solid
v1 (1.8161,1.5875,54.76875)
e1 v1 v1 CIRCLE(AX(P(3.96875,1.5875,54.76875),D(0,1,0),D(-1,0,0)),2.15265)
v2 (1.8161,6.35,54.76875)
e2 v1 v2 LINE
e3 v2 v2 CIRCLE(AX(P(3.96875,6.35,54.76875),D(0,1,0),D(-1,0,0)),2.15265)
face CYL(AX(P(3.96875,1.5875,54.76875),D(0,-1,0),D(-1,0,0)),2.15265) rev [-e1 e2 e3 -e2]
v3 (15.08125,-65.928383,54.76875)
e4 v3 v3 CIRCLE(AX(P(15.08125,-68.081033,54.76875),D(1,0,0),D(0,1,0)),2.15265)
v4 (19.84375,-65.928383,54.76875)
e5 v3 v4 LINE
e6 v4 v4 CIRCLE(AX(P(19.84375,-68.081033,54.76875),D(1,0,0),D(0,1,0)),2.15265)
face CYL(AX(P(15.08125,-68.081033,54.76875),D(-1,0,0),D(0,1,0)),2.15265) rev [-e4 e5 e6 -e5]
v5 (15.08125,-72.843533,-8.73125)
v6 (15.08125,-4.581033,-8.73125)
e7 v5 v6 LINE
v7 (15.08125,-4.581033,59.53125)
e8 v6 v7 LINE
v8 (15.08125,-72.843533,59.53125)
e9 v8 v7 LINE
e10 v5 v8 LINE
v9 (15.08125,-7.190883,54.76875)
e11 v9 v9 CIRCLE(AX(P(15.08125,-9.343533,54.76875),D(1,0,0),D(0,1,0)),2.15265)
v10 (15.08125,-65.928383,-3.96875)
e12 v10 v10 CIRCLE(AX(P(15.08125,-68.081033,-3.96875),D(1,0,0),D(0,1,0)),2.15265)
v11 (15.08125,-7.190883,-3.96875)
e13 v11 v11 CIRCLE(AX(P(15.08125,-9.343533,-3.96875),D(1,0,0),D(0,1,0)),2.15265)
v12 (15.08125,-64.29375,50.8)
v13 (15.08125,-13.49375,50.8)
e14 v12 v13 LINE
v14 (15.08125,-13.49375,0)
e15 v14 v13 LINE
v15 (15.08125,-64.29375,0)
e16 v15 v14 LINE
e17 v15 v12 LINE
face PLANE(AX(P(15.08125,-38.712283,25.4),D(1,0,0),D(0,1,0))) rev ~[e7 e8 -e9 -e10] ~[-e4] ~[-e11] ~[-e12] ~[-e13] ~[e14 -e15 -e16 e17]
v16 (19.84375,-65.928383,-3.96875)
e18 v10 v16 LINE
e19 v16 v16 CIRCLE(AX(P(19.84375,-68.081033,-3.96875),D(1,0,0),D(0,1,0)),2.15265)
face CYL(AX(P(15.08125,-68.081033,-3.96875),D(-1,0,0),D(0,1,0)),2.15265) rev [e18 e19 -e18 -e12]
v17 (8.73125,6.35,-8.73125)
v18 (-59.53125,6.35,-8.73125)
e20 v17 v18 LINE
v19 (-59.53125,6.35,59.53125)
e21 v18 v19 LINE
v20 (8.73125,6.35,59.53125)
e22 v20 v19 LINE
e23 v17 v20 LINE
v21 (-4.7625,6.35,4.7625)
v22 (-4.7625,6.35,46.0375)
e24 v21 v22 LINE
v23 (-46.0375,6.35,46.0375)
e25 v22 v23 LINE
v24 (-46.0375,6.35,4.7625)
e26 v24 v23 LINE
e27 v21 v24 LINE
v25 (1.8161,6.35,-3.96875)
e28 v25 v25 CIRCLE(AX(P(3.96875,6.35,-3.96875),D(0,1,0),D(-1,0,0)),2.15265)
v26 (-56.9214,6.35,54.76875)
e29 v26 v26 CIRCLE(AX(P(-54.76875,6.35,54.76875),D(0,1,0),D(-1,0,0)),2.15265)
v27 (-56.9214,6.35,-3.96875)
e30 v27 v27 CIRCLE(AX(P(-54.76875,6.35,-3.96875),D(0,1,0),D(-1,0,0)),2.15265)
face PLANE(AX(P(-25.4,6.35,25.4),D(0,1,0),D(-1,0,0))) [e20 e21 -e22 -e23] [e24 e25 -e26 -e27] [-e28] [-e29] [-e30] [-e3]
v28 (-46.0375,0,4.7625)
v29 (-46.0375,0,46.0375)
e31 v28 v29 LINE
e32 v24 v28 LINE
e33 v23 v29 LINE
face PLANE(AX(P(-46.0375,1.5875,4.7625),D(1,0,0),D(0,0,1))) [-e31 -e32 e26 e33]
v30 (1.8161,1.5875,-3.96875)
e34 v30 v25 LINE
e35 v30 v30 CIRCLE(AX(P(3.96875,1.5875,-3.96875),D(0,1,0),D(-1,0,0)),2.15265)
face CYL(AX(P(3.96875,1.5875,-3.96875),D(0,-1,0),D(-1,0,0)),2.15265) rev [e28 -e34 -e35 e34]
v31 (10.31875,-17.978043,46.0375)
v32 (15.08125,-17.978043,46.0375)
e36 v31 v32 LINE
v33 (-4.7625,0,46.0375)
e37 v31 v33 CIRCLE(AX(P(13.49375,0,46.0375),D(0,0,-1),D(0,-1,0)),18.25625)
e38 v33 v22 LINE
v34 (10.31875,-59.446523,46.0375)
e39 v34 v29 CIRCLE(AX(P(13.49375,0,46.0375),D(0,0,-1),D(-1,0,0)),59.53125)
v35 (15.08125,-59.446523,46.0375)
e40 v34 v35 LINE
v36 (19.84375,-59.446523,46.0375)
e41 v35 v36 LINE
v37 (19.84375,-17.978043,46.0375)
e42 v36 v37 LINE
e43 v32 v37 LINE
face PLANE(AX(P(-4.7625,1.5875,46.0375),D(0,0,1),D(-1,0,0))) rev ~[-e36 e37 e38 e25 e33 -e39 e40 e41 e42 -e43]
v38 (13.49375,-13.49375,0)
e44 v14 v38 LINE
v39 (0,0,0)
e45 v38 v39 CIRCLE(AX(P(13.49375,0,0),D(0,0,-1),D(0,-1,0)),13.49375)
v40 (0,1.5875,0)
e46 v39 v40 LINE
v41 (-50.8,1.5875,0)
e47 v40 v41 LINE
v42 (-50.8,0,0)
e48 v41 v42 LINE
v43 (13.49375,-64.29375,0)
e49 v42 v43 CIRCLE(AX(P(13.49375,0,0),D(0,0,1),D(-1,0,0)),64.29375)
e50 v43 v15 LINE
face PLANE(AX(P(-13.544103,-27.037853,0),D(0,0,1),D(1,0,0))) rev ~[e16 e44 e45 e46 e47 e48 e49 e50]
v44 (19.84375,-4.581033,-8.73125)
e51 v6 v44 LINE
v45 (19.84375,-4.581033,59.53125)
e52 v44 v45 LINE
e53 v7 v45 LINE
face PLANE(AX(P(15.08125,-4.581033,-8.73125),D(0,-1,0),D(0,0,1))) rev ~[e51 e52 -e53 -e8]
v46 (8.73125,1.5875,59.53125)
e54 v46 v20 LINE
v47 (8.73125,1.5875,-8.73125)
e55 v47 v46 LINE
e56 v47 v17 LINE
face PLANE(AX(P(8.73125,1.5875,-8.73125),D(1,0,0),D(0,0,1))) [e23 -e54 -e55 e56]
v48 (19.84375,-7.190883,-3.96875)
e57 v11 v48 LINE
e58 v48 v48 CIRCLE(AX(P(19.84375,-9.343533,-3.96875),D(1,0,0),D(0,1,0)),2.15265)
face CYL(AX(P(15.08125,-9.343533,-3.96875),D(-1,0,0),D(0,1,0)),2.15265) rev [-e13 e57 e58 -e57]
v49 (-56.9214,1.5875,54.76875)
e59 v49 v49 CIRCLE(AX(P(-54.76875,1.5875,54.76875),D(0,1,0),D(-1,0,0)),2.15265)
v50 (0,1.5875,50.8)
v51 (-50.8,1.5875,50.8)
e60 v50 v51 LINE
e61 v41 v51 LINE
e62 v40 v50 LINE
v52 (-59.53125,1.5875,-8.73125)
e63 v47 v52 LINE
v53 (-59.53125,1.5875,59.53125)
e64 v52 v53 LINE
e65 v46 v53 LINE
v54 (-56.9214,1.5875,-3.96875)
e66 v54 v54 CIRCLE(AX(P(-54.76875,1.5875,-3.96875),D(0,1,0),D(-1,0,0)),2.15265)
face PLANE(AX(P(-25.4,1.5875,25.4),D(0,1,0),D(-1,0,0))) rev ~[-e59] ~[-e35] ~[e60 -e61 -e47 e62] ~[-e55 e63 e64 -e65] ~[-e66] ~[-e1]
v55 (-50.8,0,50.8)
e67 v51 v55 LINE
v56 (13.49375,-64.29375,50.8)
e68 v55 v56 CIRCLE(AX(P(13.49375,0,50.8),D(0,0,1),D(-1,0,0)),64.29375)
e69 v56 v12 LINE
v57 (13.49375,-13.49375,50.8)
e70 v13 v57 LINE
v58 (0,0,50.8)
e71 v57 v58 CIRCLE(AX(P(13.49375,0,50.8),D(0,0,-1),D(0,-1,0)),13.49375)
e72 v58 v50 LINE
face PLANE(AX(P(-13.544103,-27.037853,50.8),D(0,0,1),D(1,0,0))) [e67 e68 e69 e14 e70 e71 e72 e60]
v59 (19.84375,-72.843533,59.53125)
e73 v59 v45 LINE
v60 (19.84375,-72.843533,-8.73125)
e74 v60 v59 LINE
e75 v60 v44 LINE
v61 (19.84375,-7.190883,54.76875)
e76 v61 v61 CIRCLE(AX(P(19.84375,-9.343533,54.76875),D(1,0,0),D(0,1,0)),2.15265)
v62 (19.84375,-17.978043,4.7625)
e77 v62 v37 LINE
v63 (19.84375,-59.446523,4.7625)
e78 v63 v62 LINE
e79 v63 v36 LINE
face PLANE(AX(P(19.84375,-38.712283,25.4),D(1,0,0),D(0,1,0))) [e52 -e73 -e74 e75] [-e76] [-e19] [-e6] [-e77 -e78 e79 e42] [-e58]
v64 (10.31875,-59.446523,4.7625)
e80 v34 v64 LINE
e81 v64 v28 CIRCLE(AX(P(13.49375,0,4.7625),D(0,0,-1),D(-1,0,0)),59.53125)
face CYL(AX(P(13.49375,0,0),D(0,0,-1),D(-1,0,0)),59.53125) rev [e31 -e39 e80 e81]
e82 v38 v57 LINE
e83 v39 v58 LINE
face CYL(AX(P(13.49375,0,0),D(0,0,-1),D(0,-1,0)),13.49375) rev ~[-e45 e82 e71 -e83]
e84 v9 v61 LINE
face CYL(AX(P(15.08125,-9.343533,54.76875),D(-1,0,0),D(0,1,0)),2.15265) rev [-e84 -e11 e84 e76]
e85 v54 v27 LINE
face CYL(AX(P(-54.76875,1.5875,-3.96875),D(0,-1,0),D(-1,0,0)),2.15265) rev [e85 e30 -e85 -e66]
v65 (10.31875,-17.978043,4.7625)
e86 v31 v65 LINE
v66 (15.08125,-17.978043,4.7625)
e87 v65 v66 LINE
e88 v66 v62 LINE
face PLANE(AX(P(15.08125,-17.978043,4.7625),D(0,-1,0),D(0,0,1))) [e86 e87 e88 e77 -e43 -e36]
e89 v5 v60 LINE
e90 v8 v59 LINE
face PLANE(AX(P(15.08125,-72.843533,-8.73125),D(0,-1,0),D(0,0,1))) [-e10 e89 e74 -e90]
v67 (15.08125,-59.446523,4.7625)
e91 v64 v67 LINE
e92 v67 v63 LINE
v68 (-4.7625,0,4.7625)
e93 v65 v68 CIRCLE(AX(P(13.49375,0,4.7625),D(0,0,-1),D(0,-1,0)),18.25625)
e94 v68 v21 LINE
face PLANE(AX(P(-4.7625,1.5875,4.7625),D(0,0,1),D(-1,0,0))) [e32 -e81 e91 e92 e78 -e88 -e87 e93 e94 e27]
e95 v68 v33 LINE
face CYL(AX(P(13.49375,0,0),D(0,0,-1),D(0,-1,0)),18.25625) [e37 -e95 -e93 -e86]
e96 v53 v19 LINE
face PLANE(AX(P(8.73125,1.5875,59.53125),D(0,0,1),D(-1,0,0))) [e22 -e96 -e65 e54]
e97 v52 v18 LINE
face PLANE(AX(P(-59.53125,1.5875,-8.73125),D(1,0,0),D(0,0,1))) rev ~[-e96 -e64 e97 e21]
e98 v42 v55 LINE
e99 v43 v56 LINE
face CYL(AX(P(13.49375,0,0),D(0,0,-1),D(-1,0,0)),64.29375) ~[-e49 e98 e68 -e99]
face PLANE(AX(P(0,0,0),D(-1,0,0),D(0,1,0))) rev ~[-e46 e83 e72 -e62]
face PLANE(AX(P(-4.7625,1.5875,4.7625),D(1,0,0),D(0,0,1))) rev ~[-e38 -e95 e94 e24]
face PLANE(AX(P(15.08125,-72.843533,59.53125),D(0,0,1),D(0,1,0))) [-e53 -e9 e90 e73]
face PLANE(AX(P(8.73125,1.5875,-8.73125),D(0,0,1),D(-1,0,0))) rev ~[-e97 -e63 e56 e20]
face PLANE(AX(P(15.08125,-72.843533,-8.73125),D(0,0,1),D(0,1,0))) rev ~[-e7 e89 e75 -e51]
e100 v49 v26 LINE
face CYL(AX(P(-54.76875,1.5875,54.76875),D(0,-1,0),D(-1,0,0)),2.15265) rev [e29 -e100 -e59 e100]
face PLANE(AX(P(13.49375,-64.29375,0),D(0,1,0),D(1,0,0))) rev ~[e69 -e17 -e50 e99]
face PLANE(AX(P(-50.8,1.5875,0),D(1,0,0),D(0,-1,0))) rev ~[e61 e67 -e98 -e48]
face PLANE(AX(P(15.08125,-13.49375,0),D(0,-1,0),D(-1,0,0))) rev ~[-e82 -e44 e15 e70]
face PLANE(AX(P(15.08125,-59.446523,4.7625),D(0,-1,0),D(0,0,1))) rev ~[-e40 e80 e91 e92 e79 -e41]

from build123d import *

# Parameters (mm, degrees)
F1_DEPTH = 50.8
F2_T     = -4.7625
F3_DEPTH = 4.7625
F4_W     = 68.2625
F4_H     = 68.2625
F4_R     = 2.15265
F4_W_2   = 50.8
F4_H_2   = 50.8
F4_W_3   = 41.4684797912
F4_H_3   = 41.275
F5_DEPTH = 4.7625
F6_W     = 68.2625
F6_H     = 68.2625
F6_R     = 2.15265
F6_W_2   = 41.275
F6_H_2   = 41.275
F7_DEPTH = 4.7625
F8_R     = 2.15265
F9_DEPTH = 74.6135


# Not quite as in the source:
# - a feature names something its author has since deleted; it is built from what else it names


with BuildPart() as f1:
    # F0 (on Top) → F1 (new body)
    with BuildSketch(Plane.XY):
        with BuildLine():
            ThreePointArc((13.49375, -13.49375), (3.9522278714, -9.5415221286), (0, 0))
            Line((0, 0), (0, 1.5875))
            Line((0, 1.5875), (-50.8, 1.5875))
            Line((-50.8, 1.5875), (-50.8, 0))
            ThreePointArc((-50.8, 0), (-31.9687966129, -45.4625466129), (13.49375, -64.29375))
            Line((13.49375, -64.29375), (15.08125, -64.29375))
            Line((15.08125, -64.29375), (15.08125, -13.49375))
            Line((15.08125, -13.49375), (13.49375, -13.49375))
        make_face()
    extrude(amount=F1_DEPTH)

    # F2
    f2_openings = [f1.faces().sort_by_distance(p)[0] for p in [
        (-25.4, 1.5875, 25.4),
    ]]
    offset(amount=F2_T, openings=f2_openings)

    # F3 (cut, through all): a face of the model
    f3_faces = [f1.faces().sort_by_distance(p)[0] for p in [
        (10.31875, -38.7122831446, 25.4),
    ]]
    extrude(f3_faces, amount=-F3_DEPTH, mode=Mode.SUBTRACT)

    # F4 (on face) → F5 (join)
    with BuildSketch(Plane.YZ.offset(15.08125)):
        with Locations((-38.7122831446, 25.4)):
            Rectangle(F4_W, F4_H)
        with Locations((-68.0810331446, -3.96875)):
            Circle(F4_R, mode=Mode.SUBTRACT)
        with Locations((-38.89375, 25.4)):
            Rectangle(F4_W_2, F4_H_2, mode=Mode.SUBTRACT)
        with Locations((-9.3435331446, -3.96875)):
            Circle(F4_R, mode=Mode.SUBTRACT)
        with Locations((-68.0810331446, 54.76875)):
            Circle(F4_R, mode=Mode.SUBTRACT)
        with Locations((-9.3435331446, 54.76875)):
            Circle(F4_R, mode=Mode.SUBTRACT)
        with Locations((-38.89375, 25.4)):
            Rectangle(F4_W_2, F4_H_2)
        with Locations((-38.7122831446, 25.4)):
            Rectangle(F4_W_3, F4_H_3, mode=Mode.SUBTRACT)
    extrude(amount=F5_DEPTH)

    # F6 (on face) → F7 (join)
    with BuildSketch(Plane(origin=(0, 1.5875, 0), x_dir=(-1, 0, 0), z_dir=(0, 1, 0))):
        with Locations((25.4, 25.4)):
            Rectangle(F6_W, F6_H)
        with Locations((-3.96875, -3.96875)):
            Circle(F6_R, mode=Mode.SUBTRACT)
        with Locations((54.76875, -3.96875)):
            Circle(F6_R, mode=Mode.SUBTRACT)
        with Locations((25.4, 25.4)):
            Rectangle(F6_W_2, F6_H_2, mode=Mode.SUBTRACT)
        with Locations((-3.96875, 54.76875)):
            Circle(F6_R, mode=Mode.SUBTRACT)
        with Locations((54.76875, 54.76875)):
            Circle(F6_R, mode=Mode.SUBTRACT)
    extrude(amount=F7_DEPTH)

    # F8 (on face) → F9 (cut, through all)
    with BuildSketch(Plane(origin=(15.08125, 0, 0), x_dir=(0, -1, 0), z_dir=(-1, 0, 0))):
        with BuildLine():
            ThreePointArc((68.0810331446, 59.53125), (64.7134370992, 51.4011539546), (72.8435331446, 54.76875))
            ThreePointArc((72.8435331446, 54.76875), (71.44862919, 58.1363460454), (68.0810331446, 59.53125))
        make_face()
        with Locations((68.0810331446, 54.76875)):
            Circle(F8_R, mode=Mode.SUBTRACT)
        with Locations((68.0810331446, 54.76875)):
            Circle(F8_R)
    extrude(amount=F9_DEPTH, mode=Mode.SUBTRACT)


solid = f1.part
